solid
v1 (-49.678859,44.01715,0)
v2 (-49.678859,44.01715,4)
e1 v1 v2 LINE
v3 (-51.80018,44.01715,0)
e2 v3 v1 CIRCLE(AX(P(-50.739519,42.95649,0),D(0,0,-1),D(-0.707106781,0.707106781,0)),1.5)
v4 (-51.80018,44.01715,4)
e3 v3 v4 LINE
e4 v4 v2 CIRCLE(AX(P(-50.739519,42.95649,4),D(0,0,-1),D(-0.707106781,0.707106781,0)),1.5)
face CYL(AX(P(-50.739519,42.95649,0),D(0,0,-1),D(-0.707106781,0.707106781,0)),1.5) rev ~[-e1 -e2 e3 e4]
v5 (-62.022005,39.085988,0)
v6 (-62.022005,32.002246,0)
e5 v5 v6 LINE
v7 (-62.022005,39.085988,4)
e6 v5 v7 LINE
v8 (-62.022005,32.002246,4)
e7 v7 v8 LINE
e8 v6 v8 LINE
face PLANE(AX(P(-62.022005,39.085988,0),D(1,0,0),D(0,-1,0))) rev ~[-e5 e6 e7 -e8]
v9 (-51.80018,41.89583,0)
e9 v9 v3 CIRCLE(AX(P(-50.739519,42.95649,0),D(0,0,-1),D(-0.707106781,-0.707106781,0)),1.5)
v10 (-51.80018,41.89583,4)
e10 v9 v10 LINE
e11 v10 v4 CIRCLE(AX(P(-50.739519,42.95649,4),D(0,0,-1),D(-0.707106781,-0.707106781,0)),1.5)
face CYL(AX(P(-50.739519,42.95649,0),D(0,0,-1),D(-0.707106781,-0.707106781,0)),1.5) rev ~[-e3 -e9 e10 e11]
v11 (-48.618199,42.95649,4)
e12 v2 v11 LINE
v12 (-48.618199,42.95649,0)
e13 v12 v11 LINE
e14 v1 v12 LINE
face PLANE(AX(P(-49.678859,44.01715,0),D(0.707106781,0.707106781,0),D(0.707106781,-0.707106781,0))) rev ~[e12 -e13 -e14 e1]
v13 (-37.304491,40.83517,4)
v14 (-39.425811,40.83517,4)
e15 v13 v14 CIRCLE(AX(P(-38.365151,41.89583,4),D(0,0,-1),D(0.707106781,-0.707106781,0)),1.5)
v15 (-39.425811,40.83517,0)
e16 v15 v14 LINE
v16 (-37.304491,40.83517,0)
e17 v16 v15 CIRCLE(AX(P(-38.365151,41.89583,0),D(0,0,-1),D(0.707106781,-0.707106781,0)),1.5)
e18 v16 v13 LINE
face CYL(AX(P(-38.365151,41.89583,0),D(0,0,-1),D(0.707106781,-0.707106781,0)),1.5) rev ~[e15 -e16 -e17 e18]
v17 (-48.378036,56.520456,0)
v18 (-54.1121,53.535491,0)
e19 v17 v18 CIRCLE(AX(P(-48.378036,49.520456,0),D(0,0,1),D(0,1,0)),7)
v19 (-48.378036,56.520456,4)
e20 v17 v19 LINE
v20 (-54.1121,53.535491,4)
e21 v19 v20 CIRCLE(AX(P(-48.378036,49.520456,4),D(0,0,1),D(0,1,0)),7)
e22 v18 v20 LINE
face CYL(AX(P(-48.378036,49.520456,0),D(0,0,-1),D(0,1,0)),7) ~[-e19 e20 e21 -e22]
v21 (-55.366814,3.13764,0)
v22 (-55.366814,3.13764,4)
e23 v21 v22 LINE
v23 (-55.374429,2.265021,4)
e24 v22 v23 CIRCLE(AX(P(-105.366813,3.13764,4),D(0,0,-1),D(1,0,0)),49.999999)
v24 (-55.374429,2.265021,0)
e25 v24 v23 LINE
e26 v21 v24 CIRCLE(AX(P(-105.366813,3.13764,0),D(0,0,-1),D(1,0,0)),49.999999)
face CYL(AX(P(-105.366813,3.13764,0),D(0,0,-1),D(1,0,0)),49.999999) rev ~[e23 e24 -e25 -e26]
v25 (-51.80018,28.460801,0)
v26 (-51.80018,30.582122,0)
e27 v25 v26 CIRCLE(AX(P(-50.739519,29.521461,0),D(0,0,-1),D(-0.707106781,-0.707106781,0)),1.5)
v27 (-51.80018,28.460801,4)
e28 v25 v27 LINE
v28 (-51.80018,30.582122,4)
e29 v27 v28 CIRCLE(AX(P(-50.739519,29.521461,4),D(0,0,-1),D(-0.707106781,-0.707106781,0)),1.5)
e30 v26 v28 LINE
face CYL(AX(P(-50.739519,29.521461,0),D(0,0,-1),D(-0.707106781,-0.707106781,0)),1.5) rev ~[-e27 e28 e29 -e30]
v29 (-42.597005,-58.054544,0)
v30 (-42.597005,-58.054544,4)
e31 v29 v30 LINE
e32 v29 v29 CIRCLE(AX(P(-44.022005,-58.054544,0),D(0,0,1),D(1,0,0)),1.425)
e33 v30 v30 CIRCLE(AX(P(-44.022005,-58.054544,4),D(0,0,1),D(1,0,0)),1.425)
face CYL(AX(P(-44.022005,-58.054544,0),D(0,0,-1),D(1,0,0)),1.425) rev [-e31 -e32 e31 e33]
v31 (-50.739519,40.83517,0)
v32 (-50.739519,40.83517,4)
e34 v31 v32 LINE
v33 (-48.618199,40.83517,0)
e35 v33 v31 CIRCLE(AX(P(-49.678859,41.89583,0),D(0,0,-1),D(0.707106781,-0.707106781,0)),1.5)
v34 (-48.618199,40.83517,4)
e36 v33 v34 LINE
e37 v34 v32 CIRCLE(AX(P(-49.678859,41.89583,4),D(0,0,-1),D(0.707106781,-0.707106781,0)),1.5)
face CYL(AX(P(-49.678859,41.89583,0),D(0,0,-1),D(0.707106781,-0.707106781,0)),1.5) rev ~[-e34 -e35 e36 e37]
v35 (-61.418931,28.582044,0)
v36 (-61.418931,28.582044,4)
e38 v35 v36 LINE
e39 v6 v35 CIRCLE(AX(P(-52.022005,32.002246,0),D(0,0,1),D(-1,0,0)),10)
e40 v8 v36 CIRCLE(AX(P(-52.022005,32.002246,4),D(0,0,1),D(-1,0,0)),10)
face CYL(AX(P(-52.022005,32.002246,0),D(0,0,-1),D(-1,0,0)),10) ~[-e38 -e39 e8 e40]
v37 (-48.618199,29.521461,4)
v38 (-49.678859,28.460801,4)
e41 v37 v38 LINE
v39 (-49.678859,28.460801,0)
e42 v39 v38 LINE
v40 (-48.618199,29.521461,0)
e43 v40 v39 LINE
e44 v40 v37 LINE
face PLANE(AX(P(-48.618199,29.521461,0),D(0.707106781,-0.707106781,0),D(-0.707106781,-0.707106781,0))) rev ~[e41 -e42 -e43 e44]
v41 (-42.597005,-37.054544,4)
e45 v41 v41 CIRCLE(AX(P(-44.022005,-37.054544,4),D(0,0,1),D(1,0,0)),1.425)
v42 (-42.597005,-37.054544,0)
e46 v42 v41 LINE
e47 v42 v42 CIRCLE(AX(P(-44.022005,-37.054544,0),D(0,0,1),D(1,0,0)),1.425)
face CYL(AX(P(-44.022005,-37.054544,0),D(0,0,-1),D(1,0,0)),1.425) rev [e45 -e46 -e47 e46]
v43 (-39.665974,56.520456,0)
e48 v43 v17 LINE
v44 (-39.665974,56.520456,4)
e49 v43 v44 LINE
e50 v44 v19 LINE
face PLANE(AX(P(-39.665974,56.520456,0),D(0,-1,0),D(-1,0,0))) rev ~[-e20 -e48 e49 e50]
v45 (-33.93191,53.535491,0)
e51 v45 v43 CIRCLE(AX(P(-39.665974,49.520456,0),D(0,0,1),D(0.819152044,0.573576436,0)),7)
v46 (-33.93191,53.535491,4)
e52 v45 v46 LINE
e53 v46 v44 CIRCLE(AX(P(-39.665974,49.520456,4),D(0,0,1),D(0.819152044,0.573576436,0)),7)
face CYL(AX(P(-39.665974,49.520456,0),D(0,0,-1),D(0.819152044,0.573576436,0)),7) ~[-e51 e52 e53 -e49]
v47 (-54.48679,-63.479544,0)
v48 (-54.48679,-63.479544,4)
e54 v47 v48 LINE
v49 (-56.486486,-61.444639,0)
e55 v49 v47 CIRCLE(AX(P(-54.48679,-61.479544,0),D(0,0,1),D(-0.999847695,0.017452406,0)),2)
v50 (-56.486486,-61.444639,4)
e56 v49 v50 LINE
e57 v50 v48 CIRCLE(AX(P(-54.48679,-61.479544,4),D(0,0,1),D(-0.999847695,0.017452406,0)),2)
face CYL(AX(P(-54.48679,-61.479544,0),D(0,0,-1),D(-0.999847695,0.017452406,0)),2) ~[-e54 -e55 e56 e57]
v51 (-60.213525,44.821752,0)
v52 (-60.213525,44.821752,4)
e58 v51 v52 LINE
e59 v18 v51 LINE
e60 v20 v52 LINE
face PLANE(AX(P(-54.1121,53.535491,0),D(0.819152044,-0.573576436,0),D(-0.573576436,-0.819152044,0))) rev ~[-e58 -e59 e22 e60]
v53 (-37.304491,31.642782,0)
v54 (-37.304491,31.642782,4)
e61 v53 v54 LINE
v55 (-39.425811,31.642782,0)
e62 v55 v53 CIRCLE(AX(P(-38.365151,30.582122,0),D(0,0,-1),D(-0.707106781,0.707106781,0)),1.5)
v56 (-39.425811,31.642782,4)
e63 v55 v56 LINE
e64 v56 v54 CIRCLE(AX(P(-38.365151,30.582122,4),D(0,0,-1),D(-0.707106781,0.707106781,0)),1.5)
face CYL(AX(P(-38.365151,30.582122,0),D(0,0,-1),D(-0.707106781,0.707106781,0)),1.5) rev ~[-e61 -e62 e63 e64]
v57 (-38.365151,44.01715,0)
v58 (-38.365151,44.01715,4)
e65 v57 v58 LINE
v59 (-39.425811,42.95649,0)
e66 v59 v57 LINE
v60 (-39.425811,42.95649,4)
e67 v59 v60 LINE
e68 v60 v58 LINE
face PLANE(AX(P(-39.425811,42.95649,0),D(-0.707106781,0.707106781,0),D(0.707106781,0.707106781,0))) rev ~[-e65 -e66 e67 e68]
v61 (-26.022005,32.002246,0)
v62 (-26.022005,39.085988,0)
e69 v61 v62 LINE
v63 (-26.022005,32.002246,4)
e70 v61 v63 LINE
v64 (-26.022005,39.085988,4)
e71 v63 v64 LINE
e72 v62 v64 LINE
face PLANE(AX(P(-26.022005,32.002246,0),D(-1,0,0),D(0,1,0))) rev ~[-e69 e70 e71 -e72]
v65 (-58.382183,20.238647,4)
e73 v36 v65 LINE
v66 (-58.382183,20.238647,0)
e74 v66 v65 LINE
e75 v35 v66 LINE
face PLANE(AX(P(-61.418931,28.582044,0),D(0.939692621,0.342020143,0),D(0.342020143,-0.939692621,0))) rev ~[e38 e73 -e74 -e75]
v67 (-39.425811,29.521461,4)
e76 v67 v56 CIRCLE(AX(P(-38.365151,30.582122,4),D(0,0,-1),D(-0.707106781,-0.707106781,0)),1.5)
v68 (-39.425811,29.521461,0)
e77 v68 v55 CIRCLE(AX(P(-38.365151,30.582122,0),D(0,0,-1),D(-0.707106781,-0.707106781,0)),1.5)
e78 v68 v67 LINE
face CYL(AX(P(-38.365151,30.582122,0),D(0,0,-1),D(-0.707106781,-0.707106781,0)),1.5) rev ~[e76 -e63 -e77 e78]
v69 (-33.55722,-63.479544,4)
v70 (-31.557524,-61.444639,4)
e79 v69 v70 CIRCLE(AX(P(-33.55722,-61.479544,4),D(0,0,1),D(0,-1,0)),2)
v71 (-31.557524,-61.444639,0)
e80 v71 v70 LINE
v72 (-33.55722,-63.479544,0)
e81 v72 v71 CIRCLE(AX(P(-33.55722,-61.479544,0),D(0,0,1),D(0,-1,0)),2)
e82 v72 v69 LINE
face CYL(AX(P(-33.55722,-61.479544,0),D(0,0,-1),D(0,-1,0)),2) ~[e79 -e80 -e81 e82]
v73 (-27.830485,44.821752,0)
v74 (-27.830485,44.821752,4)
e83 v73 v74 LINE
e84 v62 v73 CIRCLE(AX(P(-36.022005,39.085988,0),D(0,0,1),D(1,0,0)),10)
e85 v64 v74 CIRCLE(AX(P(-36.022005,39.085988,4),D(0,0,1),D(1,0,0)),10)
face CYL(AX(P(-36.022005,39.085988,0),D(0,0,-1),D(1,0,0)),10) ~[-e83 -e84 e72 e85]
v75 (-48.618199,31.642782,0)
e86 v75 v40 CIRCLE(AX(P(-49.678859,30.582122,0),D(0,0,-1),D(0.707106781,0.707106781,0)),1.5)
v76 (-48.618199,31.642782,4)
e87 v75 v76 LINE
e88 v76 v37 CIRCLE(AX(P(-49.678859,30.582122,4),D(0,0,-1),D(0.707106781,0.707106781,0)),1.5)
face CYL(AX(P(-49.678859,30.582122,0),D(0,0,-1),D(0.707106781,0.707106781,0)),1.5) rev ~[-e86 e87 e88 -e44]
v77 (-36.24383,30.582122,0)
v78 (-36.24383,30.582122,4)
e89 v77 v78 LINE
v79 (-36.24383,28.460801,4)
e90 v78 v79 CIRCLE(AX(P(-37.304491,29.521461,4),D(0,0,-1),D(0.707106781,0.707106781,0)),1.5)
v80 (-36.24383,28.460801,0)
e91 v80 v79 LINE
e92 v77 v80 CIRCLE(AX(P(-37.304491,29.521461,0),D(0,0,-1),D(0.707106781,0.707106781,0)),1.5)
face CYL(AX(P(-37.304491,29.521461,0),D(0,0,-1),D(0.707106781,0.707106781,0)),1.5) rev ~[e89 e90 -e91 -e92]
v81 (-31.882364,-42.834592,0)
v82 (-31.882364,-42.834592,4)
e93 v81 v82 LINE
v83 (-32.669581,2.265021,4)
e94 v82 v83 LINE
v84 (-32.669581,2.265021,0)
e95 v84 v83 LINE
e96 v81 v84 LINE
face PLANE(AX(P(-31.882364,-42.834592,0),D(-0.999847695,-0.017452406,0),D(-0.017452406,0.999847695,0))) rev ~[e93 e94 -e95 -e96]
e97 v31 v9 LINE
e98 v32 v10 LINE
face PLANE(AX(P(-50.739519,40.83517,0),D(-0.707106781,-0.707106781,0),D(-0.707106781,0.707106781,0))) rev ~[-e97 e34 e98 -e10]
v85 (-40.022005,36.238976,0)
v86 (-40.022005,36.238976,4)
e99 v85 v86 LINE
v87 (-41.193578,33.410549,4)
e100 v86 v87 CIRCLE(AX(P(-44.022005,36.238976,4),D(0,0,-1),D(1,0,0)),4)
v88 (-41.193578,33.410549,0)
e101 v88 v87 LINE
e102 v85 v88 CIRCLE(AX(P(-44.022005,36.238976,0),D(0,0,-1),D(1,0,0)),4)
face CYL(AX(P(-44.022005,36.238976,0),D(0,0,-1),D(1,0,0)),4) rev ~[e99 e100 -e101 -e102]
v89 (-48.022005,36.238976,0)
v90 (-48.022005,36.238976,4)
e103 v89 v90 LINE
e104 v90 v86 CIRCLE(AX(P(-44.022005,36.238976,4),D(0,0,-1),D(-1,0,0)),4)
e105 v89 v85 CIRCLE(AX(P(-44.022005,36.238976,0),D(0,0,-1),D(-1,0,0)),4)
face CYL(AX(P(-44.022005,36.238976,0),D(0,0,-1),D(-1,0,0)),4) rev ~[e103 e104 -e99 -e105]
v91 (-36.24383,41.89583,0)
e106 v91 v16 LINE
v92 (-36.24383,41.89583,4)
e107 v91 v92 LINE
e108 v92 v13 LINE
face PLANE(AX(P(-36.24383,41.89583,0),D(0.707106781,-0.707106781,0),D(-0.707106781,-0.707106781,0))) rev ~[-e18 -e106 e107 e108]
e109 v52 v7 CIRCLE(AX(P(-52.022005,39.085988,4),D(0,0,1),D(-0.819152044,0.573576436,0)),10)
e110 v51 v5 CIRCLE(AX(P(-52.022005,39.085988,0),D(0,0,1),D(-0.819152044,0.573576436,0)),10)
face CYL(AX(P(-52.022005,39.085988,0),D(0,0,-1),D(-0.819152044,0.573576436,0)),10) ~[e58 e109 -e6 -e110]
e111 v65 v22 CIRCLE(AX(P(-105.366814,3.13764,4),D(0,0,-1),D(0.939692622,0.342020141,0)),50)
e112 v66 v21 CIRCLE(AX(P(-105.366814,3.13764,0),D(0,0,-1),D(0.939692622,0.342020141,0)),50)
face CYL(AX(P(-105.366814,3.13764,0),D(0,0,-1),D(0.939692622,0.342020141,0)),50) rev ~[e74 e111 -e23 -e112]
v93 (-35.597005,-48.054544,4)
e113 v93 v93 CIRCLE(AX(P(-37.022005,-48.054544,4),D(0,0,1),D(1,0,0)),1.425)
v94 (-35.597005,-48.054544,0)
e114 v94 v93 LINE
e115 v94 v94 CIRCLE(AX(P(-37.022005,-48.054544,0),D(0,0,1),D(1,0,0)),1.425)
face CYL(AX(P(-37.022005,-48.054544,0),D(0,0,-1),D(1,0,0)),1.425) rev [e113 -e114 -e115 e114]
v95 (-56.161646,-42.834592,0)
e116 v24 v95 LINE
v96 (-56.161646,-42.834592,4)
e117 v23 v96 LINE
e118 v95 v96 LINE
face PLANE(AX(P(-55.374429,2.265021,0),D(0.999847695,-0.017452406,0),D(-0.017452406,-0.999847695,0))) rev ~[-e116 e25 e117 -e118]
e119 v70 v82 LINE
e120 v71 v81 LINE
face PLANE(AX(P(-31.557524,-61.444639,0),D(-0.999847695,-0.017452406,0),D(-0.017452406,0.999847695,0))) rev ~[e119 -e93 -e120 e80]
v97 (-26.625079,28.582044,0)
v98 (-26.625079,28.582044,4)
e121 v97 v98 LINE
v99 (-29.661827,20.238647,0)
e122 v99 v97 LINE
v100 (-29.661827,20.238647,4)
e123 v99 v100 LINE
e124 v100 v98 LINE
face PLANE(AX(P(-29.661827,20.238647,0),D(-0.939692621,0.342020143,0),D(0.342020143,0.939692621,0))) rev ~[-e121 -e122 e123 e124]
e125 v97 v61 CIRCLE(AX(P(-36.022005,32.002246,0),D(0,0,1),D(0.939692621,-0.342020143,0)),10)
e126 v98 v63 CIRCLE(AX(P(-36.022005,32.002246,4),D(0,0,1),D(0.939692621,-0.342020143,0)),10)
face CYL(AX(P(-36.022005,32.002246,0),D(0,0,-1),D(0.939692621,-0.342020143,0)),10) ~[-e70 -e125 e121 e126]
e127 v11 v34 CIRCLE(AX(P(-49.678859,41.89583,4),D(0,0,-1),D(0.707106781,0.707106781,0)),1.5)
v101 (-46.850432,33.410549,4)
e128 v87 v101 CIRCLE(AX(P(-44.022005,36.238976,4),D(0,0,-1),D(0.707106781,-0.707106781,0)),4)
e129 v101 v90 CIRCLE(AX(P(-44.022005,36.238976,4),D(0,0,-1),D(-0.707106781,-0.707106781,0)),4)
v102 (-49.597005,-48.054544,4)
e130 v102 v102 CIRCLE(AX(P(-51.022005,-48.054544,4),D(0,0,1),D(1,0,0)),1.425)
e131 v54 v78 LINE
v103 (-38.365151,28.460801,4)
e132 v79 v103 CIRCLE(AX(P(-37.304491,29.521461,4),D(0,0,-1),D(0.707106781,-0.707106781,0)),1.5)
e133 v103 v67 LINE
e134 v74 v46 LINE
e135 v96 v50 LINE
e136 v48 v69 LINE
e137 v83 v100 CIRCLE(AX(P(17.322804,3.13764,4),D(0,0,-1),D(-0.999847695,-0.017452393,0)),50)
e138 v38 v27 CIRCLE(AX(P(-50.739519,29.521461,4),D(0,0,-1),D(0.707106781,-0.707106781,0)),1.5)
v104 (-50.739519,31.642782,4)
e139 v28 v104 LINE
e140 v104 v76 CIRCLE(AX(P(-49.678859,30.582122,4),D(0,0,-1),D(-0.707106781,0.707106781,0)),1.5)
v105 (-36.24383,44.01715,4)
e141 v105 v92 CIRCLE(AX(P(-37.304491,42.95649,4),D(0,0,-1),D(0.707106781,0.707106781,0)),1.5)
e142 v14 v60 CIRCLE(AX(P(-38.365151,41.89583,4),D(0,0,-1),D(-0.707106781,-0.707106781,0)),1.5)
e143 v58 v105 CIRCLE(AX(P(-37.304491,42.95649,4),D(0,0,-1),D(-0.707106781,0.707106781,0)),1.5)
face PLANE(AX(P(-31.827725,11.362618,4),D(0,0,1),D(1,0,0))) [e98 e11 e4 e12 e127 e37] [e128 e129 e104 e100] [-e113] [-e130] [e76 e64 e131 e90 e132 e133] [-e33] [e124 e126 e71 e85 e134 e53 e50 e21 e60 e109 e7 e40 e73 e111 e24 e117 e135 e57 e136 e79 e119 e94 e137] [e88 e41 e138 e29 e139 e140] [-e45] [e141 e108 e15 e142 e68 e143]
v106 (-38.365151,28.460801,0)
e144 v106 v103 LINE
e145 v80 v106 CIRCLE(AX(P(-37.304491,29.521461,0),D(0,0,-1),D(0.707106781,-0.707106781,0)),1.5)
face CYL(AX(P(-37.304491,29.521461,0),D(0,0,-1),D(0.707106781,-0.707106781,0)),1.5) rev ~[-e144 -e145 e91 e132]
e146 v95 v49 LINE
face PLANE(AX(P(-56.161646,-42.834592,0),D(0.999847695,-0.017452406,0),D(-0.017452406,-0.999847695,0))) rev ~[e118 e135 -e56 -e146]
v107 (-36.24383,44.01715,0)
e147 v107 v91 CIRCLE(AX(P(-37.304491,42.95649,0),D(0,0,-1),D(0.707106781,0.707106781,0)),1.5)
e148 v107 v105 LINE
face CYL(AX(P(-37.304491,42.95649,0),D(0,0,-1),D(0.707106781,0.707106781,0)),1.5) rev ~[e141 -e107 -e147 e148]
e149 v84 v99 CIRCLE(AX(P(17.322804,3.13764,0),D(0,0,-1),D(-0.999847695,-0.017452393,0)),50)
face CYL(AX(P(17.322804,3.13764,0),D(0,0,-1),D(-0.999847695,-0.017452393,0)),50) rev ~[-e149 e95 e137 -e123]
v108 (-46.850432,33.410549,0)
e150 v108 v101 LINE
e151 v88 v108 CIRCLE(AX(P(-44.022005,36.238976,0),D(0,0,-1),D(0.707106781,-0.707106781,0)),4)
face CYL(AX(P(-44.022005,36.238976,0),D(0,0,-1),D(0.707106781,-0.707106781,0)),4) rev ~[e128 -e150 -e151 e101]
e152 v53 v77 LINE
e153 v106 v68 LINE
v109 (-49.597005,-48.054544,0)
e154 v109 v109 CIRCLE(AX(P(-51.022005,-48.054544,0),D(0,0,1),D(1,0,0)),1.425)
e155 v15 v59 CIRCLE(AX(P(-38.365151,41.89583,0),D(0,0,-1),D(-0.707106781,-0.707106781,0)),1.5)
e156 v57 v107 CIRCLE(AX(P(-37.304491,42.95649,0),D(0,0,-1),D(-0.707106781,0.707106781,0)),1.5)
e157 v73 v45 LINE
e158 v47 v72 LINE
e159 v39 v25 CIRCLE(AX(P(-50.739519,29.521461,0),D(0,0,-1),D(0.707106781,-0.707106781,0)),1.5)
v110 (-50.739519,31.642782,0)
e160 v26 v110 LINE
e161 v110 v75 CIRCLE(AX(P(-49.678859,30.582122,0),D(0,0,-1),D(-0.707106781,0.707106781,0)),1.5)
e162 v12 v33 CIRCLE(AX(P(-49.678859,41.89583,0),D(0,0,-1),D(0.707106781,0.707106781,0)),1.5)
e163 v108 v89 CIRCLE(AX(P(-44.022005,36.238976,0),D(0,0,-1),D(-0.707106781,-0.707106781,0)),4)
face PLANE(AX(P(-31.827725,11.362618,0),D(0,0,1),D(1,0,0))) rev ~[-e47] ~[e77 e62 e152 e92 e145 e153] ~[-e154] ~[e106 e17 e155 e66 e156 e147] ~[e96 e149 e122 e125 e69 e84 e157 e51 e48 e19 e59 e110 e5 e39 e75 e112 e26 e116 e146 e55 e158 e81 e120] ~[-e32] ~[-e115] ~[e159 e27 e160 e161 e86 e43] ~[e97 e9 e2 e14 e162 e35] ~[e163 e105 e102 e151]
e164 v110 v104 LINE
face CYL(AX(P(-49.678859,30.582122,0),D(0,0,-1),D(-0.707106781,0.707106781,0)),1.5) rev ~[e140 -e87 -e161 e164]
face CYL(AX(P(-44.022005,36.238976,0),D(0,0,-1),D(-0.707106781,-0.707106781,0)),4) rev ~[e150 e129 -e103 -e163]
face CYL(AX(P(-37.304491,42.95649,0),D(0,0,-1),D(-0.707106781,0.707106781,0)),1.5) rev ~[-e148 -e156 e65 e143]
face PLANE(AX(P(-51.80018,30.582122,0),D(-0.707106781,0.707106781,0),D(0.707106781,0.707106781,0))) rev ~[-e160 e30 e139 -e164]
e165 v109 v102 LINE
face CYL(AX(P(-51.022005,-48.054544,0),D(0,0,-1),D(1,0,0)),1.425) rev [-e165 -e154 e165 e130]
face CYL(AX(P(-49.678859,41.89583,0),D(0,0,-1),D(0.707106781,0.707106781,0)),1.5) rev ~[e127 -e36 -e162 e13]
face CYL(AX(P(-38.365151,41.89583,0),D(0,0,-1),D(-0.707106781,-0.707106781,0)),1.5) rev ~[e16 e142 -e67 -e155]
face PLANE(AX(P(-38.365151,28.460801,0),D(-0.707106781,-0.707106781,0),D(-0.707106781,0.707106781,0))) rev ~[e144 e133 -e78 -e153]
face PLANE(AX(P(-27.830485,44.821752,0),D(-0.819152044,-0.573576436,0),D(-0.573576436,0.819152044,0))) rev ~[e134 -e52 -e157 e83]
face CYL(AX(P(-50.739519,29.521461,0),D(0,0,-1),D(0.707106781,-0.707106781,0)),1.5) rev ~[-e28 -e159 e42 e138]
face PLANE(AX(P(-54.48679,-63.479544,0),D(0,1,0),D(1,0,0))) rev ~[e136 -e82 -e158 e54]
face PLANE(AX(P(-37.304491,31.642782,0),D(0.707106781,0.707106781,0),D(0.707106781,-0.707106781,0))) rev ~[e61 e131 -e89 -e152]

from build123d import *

# Parameters (mm, degrees)
F0_R     = 1.425
F1_DEPTH = 4


# Not quite as in the source:
# - a feature names something its author has since deleted; it is built from what else it names


with BuildPart() as f1:
    # F0 (on Top) → F1 (new body)
    with BuildSketch(Plane.XY):
        with BuildLine():
            ThreePointArc((-32.6695806955, 2.2650205107), (-31.9914759382, 11.3900208154), (-29.6618269361, 20.2386473839))
            Line((-29.6618269361, 20.2386473839), (-32.8313113004, 11.5305606615))
            Line((-32.8313113004, 11.5305606615), (-32.6695806955, 2.2650205107))
        make_face()
        with BuildLine():
            Line((-55.2126988023, 11.5305606615), (-58.3821831004, 20.2386472017))
            ThreePointArc((-58.3821831004, 20.2386472017), (-56.126426517, 11.8200489678), (-55.3668141772, 3.1376401385))
            ThreePointArc((-55.3668141772, 3.1376401385), (-55.3687180209, 2.7013137107), (-55.3744294072, 2.2650205107))
            Line((-55.3744294072, 2.2650205107), (-55.2126988023, 11.5305606615))
        make_face()
        with BuildLine():
            Line((-39.6659744052, 56.5204558903), (-48.3780356975, 56.5204558903))
            ThreePointArc((-48.3780356975, 56.5204558903), (-51.6102759902, 55.7295317226), (-54.1121000075, 53.5354909448))
            Line((-54.1121000075, 53.5354909448), (-60.2135254943, 44.8217522976))
            ThreePointArc((-60.2135254943, 44.8217522976), (-61.5591745589, 42.0930459292), (-62.0220050514, 39.0859879341))
            Line((-62.0220050514, 39.0859879341), (-62.0220050514, 36.2389758229))
            Line((-62.0220050514, 36.2389758229), (-48.0220050514, 36.2389758229))
            ThreePointArc((-48.0220050514, 36.2389758229), (-44.0220050514, 40.2389758229), (-40.0220050514, 36.2389758229))
            Line((-40.0220050514, 36.2389758229), (-26.0220050514, 36.2389758229))
            Line((-26.0220050514, 36.2389758229), (-26.0220050514, 39.0859879341))
            ThreePointArc((-26.0220050514, 39.0859879341), (-26.4848355439, 42.0930459292), (-27.8304846085, 44.8217522976))
            Line((-27.8304846085, 44.8217522976), (-33.9319100952, 53.5354909448))
            ThreePointArc((-33.9319100952, 53.5354909448), (-36.4337341126, 55.7295317226), (-39.6659744052, 56.5204558903))
        make_face()
        with BuildLine():
            Line((-49.6788593009, 44.017150416), (-48.6181991291, 42.9564902442))
            ThreePointArc((-48.6181991291, 42.9564902442), (-48.1788593009, 41.8958300724), (-48.6181991291, 40.8351699006))
            ThreePointArc((-48.6181991291, 40.8351699006), (-49.6788593009, 40.3958300724), (-50.7395194726, 40.8351699006))
            Line((-50.7395194726, 40.8351699006), (-51.8001796444, 41.8958300724))
            ThreePointArc((-51.8001796444, 41.8958300724), (-52.2395194726, 42.9564902442), (-51.8001796444, 44.017150416))
            ThreePointArc((-51.8001796444, 44.017150416), (-50.7395194726, 44.4564902442), (-49.6788593009, 44.017150416))
        make_face(mode=Mode.SUBTRACT)
        with BuildLine():
            ThreePointArc((-36.2438304583, 44.017150416), (-35.8044906301, 42.9564902442), (-36.2438304583, 41.8958300724))
            Line((-36.2438304583, 41.8958300724), (-37.3044906301, 40.8351699006))
            ThreePointArc((-37.3044906301, 40.8351699006), (-38.3651508019, 40.3958300724), (-39.4258109737, 40.8351699006))
            ThreePointArc((-39.4258109737, 40.8351699006), (-39.8651508019, 41.8958300724), (-39.4258109737, 42.9564902442))
            Line((-39.4258109737, 42.9564902442), (-38.3651508019, 44.017150416))
            ThreePointArc((-38.3651508019, 44.017150416), (-37.3044906301, 44.4564902442), (-36.2438304583, 44.017150416))
        make_face(mode=Mode.SUBTRACT)
        with BuildLine():
            Line((-31.557524447, -61.4446392968), (-31.8823640322, -42.8345919221))
            ThreePointArc((-31.8823640322, -42.8345919221), (-44.0220050514, -43.7610241771), (-56.1616460705, -42.8345919221))
            Line((-56.1616460705, -42.8345919221), (-56.4864856557, -61.4446392968))
            ThreePointArc((-56.4864856557, -61.4446392968), (-55.9132911637, -62.8813626383), (-54.4867902654, -63.4795441097))
            Line((-54.4867902654, -63.4795441097), (-33.5572198373, -63.4795441097))
            ThreePointArc((-33.5572198373, -63.4795441097), (-32.130718939, -62.8813626383), (-31.557524447, -61.4446392968))
        make_face()
        with Locations((-51.0220050514, -58.0545441097)):
            Circle(F0_R, mode=Mode.SUBTRACT)
        with Locations((-51.0220050514, -48.0545441097)):
            Circle(F0_R, mode=Mode.SUBTRACT)
        with Locations((-44.0220050514, -58.0545441097)):
            Circle(F0_R, mode=Mode.SUBTRACT)
        with Locations((-37.0220050514, -58.0545441097)):
            Circle(F0_R, mode=Mode.SUBTRACT)
        with Locations((-37.0220050514, -48.0545441097)):
            Circle(F0_R, mode=Mode.SUBTRACT)
        with BuildLine():
            Line((-48.0220050514, 36.2389758229), (-62.0220050514, 36.2389758229))
            Line((-62.0220050514, 36.2389758229), (-62.0220050514, 32.00224563))
            ThreePointArc((-62.0220050514, 32.00224563), (-61.8700825815, 30.2657638533), (-61.4189312592, 28.5820441968))
            Line((-61.4189312592, 28.5820441968), (-58.3821831004, 20.2386472017))
            Line((-58.3821831004, 20.2386472017), (-55.2126988023, 11.5305606615))
            Line((-55.2126988023, 11.5305606615), (-55.3744294072, 2.2650205107))
            Line((-55.3744294072, 2.2650205107), (-56.1616460705, -42.8345919221))
            ThreePointArc((-56.1616460705, -42.8345919221), (-44.0220050514, -43.7610241771), (-31.8823640322, -42.8345919221))
            Line((-31.8823640322, -42.8345919221), (-32.6695806955, 2.2650205107))
            Line((-32.6695806955, 2.2650205107), (-32.8313113004, 11.5305606615))
            Line((-32.8313113004, 11.5305606615), (-29.6618269361, 20.2386473839))
            Line((-29.6618269361, 20.2386473839), (-26.6250788435, 28.5820441968))
            ThreePointArc((-26.6250788435, 28.5820441968), (-26.1739275213, 30.2657638533), (-26.0220050514, 32.00224563))
            Line((-26.0220050514, 32.00224563), (-26.0220050514, 36.2389758229))
            Line((-26.0220050514, 36.2389758229), (-40.0220050514, 36.2389758229))
            ThreePointArc((-40.0220050514, 36.2389758229), (-40.3264869213, 34.7082420935), (-41.1935779266, 33.4105486982))
            ThreePointArc((-41.1935779266, 33.4105486982), (-44.0220050514, 32.2389758229), (-46.8504321761, 33.4105486982))
            ThreePointArc((-46.8504321761, 33.4105486982), (-47.7175231814, 34.7082420935), (-48.0220050514, 36.2389758229))
        make_face()
        with Locations((-44.0220050514, -37.0545441097)):
            Circle(F0_R, mode=Mode.SUBTRACT)
        with BuildLine():
            ThreePointArc((-50.7395194726, 31.6427817452), (-49.6788593009, 32.0821215734), (-48.6181991291, 31.6427817452))
            ThreePointArc((-48.6181991291, 31.6427817452), (-48.1788593009, 30.5821215734), (-48.6181991291, 29.5214614017))
            Line((-48.6181991291, 29.5214614017), (-49.6788593009, 28.4608012299))
            ThreePointArc((-49.6788593009, 28.4608012299), (-50.7395194726, 28.0214614017), (-51.8001796444, 28.4608012299))
            ThreePointArc((-51.8001796444, 28.4608012299), (-52.2395194726, 29.5214614017), (-51.8001796444, 30.5821215734))
            Line((-51.8001796444, 30.5821215734), (-50.7395194726, 31.6427817452))
        make_face(mode=Mode.SUBTRACT)
        with BuildLine():
            ThreePointArc((-39.4258109737, 29.5214614017), (-39.8651508019, 30.5821215734), (-39.4258109737, 31.6427817452))
            ThreePointArc((-39.4258109737, 31.6427817452), (-38.3651508019, 32.0821215734), (-37.3044906301, 31.6427817452))
            Line((-37.3044906301, 31.6427817452), (-36.2438304583, 30.5821215734))
            ThreePointArc((-36.2438304583, 30.5821215734), (-35.8044906301, 29.5214614017), (-36.2438304583, 28.4608012299))
            ThreePointArc((-36.2438304583, 28.4608012299), (-37.3044906301, 28.0214614017), (-38.3651508019, 28.4608012299))
            Line((-38.3651508019, 28.4608012299), (-39.4258109737, 29.5214614017))
        make_face(mode=Mode.SUBTRACT)
        with Locations((-51.0220050514, -58.0545441097)):
            Circle(F0_R)
        with Locations((-37.0220050514, -58.0545441097)):
            Circle(F0_R)
    extrude(amount=F1_DEPTH)


solid = f1.part
